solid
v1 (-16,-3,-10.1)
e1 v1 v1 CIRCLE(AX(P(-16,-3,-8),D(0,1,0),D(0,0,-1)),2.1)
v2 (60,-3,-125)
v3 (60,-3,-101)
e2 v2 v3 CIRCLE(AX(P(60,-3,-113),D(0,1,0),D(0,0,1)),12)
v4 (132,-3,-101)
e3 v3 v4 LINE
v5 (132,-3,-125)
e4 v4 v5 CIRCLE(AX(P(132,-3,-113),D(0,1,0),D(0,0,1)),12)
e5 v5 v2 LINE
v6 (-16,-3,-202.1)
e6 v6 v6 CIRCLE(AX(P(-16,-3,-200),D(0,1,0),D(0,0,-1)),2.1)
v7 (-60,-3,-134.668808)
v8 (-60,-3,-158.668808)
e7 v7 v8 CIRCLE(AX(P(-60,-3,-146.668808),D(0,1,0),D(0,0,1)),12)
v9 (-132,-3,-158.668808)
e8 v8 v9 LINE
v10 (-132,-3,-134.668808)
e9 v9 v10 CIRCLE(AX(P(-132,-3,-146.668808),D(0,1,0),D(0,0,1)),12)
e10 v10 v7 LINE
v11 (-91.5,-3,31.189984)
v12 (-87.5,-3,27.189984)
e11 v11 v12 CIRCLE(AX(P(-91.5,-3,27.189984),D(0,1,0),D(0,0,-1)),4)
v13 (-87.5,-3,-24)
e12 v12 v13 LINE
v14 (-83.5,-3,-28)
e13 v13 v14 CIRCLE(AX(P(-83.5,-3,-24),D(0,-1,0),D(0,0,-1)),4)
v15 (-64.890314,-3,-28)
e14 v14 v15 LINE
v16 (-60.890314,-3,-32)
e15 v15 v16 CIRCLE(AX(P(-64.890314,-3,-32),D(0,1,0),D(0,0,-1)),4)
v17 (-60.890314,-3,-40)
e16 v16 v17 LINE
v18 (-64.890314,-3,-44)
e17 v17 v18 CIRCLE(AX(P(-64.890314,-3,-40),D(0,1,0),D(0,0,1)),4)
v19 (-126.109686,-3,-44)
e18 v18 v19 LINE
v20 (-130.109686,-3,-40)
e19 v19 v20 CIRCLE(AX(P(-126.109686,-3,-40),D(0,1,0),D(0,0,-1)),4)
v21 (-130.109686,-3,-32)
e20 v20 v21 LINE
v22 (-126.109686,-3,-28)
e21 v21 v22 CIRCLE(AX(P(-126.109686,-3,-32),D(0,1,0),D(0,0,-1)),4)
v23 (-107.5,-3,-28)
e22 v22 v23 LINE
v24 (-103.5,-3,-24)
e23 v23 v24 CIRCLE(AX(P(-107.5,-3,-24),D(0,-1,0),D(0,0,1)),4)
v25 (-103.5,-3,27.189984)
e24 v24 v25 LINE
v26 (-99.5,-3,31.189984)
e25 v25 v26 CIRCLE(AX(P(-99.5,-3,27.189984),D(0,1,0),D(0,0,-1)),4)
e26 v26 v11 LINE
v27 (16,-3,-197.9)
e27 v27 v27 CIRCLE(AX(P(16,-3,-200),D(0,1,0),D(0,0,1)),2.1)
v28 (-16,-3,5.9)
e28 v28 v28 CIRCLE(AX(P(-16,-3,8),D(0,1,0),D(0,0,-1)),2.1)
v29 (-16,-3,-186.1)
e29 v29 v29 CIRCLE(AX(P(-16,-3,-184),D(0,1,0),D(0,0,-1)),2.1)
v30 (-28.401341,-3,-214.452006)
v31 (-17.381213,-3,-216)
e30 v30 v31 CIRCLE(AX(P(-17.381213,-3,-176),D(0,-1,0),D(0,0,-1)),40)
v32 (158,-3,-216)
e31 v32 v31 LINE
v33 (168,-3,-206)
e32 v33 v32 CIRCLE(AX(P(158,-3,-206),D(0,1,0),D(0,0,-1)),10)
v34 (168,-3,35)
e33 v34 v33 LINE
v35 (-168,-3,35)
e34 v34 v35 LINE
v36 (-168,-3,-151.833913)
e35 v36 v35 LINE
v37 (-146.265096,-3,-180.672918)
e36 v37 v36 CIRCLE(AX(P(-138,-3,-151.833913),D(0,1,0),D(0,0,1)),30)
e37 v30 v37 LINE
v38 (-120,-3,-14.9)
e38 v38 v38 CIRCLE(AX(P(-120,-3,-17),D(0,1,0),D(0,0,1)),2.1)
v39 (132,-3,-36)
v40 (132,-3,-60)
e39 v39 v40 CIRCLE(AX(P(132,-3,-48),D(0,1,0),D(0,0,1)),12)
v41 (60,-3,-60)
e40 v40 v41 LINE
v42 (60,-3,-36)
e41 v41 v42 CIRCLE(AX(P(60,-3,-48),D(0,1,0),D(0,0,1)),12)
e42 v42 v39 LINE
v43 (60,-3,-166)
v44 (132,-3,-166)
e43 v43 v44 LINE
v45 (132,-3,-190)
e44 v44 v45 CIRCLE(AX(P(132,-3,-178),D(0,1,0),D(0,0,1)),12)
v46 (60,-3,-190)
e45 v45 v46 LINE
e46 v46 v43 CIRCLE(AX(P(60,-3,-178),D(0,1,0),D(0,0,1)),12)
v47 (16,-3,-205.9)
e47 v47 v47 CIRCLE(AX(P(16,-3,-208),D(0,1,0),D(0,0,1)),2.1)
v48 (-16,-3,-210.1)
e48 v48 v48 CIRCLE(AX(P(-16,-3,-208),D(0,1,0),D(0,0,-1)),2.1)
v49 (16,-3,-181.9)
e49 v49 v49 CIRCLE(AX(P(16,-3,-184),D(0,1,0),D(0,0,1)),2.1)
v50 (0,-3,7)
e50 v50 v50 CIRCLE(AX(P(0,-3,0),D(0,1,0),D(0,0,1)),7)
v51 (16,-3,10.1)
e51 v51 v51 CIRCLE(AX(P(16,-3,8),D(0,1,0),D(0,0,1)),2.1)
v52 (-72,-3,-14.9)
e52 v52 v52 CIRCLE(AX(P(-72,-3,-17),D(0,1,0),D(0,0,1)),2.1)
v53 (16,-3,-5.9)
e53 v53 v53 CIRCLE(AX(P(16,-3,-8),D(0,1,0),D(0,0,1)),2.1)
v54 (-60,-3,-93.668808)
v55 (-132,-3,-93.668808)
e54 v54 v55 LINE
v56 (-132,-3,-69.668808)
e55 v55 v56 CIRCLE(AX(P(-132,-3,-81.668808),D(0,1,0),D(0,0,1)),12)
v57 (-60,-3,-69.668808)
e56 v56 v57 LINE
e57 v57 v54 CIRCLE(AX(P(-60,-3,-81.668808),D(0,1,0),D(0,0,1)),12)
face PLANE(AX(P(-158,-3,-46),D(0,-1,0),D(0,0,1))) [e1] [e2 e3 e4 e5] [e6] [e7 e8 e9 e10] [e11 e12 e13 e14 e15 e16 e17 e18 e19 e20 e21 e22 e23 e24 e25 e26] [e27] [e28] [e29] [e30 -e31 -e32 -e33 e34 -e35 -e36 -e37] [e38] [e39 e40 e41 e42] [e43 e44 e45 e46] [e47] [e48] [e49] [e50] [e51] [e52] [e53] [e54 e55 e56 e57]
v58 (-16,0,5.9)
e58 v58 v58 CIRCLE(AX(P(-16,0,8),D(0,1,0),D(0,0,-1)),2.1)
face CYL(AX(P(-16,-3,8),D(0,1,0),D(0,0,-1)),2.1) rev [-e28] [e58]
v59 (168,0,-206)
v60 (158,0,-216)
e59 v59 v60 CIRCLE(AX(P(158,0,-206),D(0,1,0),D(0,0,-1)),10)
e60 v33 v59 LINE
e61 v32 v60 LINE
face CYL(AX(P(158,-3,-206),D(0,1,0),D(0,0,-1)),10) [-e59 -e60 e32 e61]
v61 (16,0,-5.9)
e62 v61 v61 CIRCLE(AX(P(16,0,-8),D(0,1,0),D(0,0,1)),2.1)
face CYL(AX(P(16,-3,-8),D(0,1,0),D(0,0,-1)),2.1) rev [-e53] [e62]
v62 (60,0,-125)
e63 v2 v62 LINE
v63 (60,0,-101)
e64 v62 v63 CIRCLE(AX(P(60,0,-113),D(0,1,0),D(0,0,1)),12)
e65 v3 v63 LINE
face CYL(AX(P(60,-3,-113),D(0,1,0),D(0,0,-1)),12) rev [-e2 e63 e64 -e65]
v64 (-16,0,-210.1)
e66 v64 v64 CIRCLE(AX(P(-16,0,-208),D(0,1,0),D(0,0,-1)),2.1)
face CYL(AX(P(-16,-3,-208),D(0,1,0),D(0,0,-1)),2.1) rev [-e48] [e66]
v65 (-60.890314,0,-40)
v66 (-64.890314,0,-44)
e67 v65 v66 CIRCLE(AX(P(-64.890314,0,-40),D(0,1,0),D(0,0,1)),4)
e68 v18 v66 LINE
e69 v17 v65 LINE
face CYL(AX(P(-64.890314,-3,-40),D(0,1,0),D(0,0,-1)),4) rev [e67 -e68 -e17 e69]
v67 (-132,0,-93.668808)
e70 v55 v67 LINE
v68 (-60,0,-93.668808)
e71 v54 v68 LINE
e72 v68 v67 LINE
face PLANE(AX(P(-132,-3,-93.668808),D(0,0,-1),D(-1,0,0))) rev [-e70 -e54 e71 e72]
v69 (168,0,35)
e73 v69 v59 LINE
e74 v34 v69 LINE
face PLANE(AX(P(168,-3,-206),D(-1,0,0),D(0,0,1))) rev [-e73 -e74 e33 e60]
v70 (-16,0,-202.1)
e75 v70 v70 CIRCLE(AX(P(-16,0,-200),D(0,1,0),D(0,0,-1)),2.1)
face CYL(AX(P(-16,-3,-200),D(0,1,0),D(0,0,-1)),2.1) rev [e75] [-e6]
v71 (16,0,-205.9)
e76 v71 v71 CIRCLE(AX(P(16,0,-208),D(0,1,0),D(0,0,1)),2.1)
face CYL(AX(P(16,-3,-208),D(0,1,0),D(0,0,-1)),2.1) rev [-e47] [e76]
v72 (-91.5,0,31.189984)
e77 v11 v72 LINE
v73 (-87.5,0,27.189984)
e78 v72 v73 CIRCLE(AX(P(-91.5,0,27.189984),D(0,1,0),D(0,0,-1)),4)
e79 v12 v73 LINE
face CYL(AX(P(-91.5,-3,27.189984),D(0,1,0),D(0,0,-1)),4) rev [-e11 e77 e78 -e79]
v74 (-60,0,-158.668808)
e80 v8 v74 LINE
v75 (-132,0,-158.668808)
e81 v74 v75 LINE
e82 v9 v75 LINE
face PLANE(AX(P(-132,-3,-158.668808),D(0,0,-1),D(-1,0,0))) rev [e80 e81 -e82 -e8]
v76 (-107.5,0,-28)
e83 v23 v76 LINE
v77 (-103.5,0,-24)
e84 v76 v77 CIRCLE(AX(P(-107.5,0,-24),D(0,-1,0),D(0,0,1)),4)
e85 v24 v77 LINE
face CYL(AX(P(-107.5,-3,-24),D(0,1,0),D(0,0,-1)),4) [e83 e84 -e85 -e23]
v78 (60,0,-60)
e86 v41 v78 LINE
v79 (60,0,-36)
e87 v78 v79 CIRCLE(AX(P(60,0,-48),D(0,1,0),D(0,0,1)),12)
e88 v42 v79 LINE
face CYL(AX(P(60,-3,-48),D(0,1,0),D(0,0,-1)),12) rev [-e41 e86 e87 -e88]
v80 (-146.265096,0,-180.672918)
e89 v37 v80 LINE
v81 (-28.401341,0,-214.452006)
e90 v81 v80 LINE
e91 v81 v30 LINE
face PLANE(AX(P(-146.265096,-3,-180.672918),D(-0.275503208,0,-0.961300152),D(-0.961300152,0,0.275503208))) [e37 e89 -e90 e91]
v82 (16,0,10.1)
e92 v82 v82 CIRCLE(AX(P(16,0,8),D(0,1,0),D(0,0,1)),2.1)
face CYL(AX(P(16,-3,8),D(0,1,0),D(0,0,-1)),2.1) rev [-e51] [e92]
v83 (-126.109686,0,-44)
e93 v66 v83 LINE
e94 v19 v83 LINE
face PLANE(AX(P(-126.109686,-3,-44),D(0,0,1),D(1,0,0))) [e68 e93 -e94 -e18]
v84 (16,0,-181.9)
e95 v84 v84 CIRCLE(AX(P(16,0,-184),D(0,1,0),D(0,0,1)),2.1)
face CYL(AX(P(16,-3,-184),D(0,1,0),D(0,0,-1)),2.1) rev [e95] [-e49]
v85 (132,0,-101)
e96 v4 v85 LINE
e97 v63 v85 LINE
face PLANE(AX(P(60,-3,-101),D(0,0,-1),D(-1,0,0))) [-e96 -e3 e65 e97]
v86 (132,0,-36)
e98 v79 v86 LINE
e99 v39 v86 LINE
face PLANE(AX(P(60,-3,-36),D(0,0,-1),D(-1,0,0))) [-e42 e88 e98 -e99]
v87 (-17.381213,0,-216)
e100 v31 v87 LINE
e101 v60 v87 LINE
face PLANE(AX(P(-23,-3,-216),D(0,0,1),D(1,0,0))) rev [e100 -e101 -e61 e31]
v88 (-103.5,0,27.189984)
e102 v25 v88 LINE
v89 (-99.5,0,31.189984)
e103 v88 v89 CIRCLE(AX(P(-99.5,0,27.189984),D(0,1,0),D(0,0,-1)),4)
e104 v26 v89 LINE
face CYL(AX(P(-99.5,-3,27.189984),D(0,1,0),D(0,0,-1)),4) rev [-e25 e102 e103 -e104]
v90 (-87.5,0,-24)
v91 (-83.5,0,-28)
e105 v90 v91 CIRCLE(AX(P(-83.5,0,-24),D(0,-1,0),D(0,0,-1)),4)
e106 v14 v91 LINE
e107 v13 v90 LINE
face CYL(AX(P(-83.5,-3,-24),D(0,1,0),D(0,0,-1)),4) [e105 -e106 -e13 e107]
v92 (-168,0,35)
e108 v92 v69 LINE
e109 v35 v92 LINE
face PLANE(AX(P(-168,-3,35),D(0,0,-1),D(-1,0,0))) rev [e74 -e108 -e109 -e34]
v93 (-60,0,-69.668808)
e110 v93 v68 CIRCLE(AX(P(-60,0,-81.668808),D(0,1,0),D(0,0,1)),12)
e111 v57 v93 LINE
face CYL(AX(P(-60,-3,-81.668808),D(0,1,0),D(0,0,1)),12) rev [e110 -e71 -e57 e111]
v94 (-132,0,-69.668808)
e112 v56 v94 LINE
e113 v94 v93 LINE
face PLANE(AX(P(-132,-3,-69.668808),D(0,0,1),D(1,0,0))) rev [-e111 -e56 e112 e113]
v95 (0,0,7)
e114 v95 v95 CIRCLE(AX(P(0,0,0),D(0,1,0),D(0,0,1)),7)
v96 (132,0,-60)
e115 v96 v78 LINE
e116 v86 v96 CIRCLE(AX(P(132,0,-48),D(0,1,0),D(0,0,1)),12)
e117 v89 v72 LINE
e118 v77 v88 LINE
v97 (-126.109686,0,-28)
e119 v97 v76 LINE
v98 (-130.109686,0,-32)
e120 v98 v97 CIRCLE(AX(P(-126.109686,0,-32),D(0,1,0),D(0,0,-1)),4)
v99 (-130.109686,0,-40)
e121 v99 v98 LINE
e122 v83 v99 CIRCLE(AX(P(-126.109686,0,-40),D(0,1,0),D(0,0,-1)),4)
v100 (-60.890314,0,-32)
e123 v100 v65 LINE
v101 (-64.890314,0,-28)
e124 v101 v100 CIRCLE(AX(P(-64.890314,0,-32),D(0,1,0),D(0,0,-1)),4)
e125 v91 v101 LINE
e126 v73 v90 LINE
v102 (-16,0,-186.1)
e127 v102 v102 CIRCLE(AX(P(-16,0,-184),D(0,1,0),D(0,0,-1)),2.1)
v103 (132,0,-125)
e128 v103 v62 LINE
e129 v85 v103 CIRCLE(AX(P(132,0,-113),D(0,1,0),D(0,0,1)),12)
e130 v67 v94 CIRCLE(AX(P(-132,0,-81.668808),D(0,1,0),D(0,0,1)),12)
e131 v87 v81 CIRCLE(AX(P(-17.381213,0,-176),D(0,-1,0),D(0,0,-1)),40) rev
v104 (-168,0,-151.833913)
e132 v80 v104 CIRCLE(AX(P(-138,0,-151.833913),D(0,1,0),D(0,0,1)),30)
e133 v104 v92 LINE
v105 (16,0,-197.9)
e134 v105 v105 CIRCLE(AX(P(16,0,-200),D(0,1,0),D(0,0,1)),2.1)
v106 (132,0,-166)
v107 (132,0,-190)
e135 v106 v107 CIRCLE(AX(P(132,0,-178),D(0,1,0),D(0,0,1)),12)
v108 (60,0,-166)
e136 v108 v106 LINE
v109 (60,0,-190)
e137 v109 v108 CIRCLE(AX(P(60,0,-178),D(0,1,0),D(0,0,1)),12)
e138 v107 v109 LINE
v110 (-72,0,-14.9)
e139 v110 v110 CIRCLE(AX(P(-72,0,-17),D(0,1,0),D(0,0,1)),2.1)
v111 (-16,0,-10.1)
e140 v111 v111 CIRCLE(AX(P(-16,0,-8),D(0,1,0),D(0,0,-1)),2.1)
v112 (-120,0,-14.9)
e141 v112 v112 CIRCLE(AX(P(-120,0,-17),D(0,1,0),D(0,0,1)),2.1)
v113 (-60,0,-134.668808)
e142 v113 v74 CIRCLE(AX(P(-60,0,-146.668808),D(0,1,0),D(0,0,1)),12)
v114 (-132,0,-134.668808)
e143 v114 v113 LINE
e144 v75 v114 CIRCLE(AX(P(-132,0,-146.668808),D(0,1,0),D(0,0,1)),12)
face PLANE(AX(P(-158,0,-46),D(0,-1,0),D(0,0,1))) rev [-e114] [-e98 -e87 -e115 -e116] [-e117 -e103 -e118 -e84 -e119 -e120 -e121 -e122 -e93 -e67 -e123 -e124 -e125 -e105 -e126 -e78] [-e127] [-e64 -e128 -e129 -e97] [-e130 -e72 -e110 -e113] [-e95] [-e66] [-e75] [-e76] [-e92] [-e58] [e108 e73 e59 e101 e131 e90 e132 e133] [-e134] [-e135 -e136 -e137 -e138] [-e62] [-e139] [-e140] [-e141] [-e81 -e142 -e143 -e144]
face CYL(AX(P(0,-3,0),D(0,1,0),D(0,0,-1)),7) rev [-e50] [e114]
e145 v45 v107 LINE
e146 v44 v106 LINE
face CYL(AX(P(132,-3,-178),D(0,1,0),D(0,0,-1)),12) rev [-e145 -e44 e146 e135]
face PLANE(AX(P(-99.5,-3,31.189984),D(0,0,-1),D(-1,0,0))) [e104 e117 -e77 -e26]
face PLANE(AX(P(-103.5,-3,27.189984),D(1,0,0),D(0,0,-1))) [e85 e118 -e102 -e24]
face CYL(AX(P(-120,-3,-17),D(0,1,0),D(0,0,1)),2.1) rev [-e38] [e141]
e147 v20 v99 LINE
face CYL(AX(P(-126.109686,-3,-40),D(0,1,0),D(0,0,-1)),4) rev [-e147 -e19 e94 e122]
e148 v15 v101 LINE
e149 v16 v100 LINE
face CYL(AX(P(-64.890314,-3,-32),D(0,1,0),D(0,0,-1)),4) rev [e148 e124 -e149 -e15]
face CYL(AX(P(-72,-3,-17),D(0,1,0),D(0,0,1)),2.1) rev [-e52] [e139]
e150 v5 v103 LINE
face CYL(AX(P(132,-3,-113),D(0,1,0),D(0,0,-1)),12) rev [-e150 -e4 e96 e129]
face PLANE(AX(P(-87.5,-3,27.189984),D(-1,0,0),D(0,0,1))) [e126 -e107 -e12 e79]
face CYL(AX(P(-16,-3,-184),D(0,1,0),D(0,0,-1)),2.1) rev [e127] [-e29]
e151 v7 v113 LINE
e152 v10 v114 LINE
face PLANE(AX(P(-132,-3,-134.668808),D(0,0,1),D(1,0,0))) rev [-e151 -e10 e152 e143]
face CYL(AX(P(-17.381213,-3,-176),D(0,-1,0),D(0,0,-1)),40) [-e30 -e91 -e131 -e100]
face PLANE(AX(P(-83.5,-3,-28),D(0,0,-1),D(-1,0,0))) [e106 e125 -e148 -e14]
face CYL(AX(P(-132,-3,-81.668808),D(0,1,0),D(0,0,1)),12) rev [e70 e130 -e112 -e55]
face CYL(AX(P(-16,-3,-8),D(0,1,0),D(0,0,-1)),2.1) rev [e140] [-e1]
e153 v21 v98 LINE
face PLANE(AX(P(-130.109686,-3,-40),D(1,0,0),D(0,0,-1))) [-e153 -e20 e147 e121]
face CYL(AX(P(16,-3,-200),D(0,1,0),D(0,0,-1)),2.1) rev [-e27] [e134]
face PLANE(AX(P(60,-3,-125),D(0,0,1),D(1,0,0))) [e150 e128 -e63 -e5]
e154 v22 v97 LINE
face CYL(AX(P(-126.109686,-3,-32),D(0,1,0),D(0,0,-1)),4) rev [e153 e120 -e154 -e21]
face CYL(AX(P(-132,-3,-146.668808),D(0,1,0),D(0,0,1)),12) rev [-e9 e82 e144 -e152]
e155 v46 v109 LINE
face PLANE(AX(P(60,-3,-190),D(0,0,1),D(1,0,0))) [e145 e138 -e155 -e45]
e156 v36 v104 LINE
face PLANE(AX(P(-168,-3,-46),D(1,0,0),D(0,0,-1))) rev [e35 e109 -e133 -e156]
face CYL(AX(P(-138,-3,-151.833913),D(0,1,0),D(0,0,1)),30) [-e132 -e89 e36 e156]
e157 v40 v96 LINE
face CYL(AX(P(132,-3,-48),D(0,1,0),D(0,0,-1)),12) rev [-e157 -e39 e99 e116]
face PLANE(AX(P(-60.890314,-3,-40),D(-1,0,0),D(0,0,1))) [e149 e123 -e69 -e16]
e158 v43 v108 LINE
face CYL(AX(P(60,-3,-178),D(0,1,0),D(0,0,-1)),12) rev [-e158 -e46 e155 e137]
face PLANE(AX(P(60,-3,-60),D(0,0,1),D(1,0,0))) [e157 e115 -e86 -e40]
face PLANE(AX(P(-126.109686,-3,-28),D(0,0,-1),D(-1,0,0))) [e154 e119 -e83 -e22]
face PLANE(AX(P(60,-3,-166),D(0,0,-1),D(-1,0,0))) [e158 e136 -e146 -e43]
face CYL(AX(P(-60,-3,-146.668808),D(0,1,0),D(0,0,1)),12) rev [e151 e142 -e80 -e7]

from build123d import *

# Parameters (mm, degrees)
SIDEPLATERIGHT_MIRRORED1_START       = -3
SIDEPLATERIGHT_MIRRORED1_OUTLINE_R   = 2.1
SIDEPLATERIGHT_MIRRORED1_OUTLINE_R_2 = 7
SIDEPLATERIGHT_MIRRORED1_DEPTH       = 3
BOSS_EXTRUDE1_DEPTH                  = 3
FILLET1_R                            = 40
SKETCH3_R                            = 2.1
CUT_EXTRUDE1_DEPTH                   = 3
CUT_EXTRUDE3_DEPTH                   = 274.658546368
CUT_EXTRUDE3_DEPTH_BACK              = 274.658546368
SKETCH5_W                            = 336
SKETCH5_H                            = 4


# Read off the part's stored shape, not the designer's step: sidePlateRight_Mirrored1
with BuildPart() as part:
    # sidePlateRight_Mirrored1 outline → sidePlateRight_Mirrored1 (new body)
    with BuildSketch(Plane(origin=(0, 0, 0), x_dir=(1, 0, 0), z_dir=(0, 1, 0)).offset(SIDEPLATERIGHT_MIRRORED1_START)):
        with BuildLine():
            Line((168, -39), (168, 206))
            ThreePointArc((168, 206), (165.071067812, 213.071067812), (158, 216))
            Line((158, 216), (-23, 216))
            Line((-23, 216), (-23, 60))
            ThreePointArc((-23, 60), (-24.171572875, 57.171572875), (-27, 56))
            Line((-27, 56), (-158, 56))
            ThreePointArc((-158, 56), (-165.071067812, 53.071067812), (-168, 46))
            Line((-168, 46), (-168, -39))
            Line((-168, -39), (168, -39))
        make_face()
        with BuildLine():
            ThreePointArc((-87.5, -27.189984024), (-88.671572875, -30.018411149), (-91.5, -31.189984024))
            Line((-91.5, -31.189984024), (-99.5, -31.189984024))
            ThreePointArc((-99.5, -31.189984024), (-102.328427125, -30.018411149), (-103.5, -27.189984024))
            Line((-103.5, -27.189984024), (-103.5, 24))
            ThreePointArc((-103.5, 24), (-104.671572875, 26.828427125), (-107.5, 28))
            Line((-107.5, 28), (-126.109686491, 28))
            ThreePointArc((-126.109686491, 28), (-128.938113615, 29.171572876), (-130.109686491, 32))
            Line((-130.109686491, 32), (-130.109686491, 40))
            ThreePointArc((-130.109686491, 40), (-128.938113615, 42.828427124), (-126.109686491, 44))
            Line((-126.109686491, 44), (-64.890313509, 44))
            ThreePointArc((-64.890313509, 44), (-62.061886384, 42.828427124), (-60.890313509, 40))
            Line((-60.890313509, 40), (-60.890313509, 32))
            ThreePointArc((-60.890313509, 32), (-62.061886384, 29.171572876), (-64.890313509, 28))
            Line((-64.890313509, 28), (-83.5, 28))
            ThreePointArc((-83.5, 28), (-86.328427125, 26.828427125), (-87.5, 24))
            Line((-87.5, 24), (-87.5, -27.189984024))
        make_face(mode=Mode.SUBTRACT)
        with Locations((-16, -8)):
            Circle(SIDEPLATERIGHT_MIRRORED1_OUTLINE_R, mode=Mode.SUBTRACT)
        with Locations((-16, 8)):
            Circle(SIDEPLATERIGHT_MIRRORED1_OUTLINE_R, mode=Mode.SUBTRACT)
        with Locations((16, -8)):
            Circle(SIDEPLATERIGHT_MIRRORED1_OUTLINE_R, mode=Mode.SUBTRACT)
        Circle(SIDEPLATERIGHT_MIRRORED1_OUTLINE_R_2, mode=Mode.SUBTRACT)
        with Locations((16, 8)):
            Circle(SIDEPLATERIGHT_MIRRORED1_OUTLINE_R, mode=Mode.SUBTRACT)
        with BuildLine():
            ThreePointArc((60, 36), (48, 48), (60, 60))
            Line((60, 60), (132, 60))
            ThreePointArc((132, 60), (144, 48), (132, 36))
            Line((132, 36), (60, 36))
        make_face(mode=Mode.SUBTRACT)
        with Locations((-16, 184)):
            Circle(SIDEPLATERIGHT_MIRRORED1_OUTLINE_R, mode=Mode.SUBTRACT)
        with Locations((-16, 200)):
            Circle(SIDEPLATERIGHT_MIRRORED1_OUTLINE_R, mode=Mode.SUBTRACT)
        with Locations((-16, 208)):
            Circle(SIDEPLATERIGHT_MIRRORED1_OUTLINE_R, mode=Mode.SUBTRACT)
        with BuildLine():
            ThreePointArc((60, 101), (48, 113), (60, 125))
            Line((60, 125), (132, 125))
            ThreePointArc((132, 125), (144, 113), (132, 101))
            Line((132, 101), (60, 101))
        make_face(mode=Mode.SUBTRACT)
        with Locations((16, 184)):
            Circle(SIDEPLATERIGHT_MIRRORED1_OUTLINE_R, mode=Mode.SUBTRACT)
        with Locations((16, 200)):
            Circle(SIDEPLATERIGHT_MIRRORED1_OUTLINE_R, mode=Mode.SUBTRACT)
        with Locations((16, 208)):
            Circle(SIDEPLATERIGHT_MIRRORED1_OUTLINE_R, mode=Mode.SUBTRACT)
        with BuildLine():
            ThreePointArc((60, 166), (48, 178), (60, 190))
            Line((60, 190), (132, 190))
            ThreePointArc((132, 190), (144, 178), (132, 166))
            Line((132, 166), (60, 166))
        make_face(mode=Mode.SUBTRACT)
    extrude(amount=SIDEPLATERIGHT_MIRRORED1_DEPTH)

    # Sketch1 → Boss-Extrude1 (add)
    with BuildSketch(Plane(origin=(0, 0, 0), x_dir=(1, 0, 0), z_dir=(0, 1, 0))):
        with BuildLine():
            Line((-168, 46), (-168, 151.833913223))
            ThreePointArc((-168, 151.833913223), (-161.957805488, 169.890035626), (-146.265096253, 180.672917782))
            Line((-146.265096253, 180.672917782), (-23, 216))
            Line((-23, 216), (-23, 46))
            Line((-23, 46), (-168, 46))
        make_face()
        with BuildLine():
            Line((-132, 93.668808042), (-60, 93.668808042))
            ThreePointArc((-60, 93.668808042), (-48, 81.668808042), (-60, 69.668808042))
            Line((-60, 69.668808042), (-132, 69.668808042))
            ThreePointArc((-132, 69.668808042), (-144, 81.668808042), (-132, 93.668808042))
        make_face(mode=Mode.SUBTRACT)
        with BuildLine():
            Line((-132, 158.668808042), (-60, 158.668808042))
            ThreePointArc((-60, 158.668808042), (-48, 146.668808042), (-60, 134.668808042))
            Line((-60, 134.668808042), (-132, 134.668808042))
            ThreePointArc((-132, 134.668808042), (-144, 146.668808042), (-132, 158.668808042))
        make_face(mode=Mode.SUBTRACT)
    extrude(amount=-BOSS_EXTRUDE1_DEPTH)

    # Fillet1
    fillet1_edges = [part.edges().sort_by_distance(p)[0] for p in [
        (-23, -1.5, -216),
    ]]
    fillet(fillet1_edges, radius=FILLET1_R)

    # Sketch3 → Cut-Extrude1 (cut)
    with BuildSketch(Plane(origin=(0, 0, 0), x_dir=(1, 0, 0), z_dir=(0, 1, 0))):
        with Locations(Location((-120, 17, 0), (0, 0, 270))):
            Circle(SKETCH3_R)
        with Locations(Location((-72, 17, 0), (0, 0, 270))):
            Circle(SKETCH3_R)
    extrude(amount=-CUT_EXTRUDE1_DEPTH, mode=Mode.SUBTRACT)

    # Sketch5 → Cut-Extrude3 (cut, two sides: drawn at the far end of the back side and taken through both)
    with BuildSketch(Plane(origin=(0, 0, 0), x_dir=(1, 0, 0), z_dir=(0, 1, 0)).offset(-CUT_EXTRUDE3_DEPTH_BACK)):
        with Locations((0, -37)):
            Rectangle(SKETCH5_W, SKETCH5_H)
    extrude(amount=CUT_EXTRUDE3_DEPTH + CUT_EXTRUDE3_DEPTH_BACK, mode=Mode.SUBTRACT)


solid = part.part
